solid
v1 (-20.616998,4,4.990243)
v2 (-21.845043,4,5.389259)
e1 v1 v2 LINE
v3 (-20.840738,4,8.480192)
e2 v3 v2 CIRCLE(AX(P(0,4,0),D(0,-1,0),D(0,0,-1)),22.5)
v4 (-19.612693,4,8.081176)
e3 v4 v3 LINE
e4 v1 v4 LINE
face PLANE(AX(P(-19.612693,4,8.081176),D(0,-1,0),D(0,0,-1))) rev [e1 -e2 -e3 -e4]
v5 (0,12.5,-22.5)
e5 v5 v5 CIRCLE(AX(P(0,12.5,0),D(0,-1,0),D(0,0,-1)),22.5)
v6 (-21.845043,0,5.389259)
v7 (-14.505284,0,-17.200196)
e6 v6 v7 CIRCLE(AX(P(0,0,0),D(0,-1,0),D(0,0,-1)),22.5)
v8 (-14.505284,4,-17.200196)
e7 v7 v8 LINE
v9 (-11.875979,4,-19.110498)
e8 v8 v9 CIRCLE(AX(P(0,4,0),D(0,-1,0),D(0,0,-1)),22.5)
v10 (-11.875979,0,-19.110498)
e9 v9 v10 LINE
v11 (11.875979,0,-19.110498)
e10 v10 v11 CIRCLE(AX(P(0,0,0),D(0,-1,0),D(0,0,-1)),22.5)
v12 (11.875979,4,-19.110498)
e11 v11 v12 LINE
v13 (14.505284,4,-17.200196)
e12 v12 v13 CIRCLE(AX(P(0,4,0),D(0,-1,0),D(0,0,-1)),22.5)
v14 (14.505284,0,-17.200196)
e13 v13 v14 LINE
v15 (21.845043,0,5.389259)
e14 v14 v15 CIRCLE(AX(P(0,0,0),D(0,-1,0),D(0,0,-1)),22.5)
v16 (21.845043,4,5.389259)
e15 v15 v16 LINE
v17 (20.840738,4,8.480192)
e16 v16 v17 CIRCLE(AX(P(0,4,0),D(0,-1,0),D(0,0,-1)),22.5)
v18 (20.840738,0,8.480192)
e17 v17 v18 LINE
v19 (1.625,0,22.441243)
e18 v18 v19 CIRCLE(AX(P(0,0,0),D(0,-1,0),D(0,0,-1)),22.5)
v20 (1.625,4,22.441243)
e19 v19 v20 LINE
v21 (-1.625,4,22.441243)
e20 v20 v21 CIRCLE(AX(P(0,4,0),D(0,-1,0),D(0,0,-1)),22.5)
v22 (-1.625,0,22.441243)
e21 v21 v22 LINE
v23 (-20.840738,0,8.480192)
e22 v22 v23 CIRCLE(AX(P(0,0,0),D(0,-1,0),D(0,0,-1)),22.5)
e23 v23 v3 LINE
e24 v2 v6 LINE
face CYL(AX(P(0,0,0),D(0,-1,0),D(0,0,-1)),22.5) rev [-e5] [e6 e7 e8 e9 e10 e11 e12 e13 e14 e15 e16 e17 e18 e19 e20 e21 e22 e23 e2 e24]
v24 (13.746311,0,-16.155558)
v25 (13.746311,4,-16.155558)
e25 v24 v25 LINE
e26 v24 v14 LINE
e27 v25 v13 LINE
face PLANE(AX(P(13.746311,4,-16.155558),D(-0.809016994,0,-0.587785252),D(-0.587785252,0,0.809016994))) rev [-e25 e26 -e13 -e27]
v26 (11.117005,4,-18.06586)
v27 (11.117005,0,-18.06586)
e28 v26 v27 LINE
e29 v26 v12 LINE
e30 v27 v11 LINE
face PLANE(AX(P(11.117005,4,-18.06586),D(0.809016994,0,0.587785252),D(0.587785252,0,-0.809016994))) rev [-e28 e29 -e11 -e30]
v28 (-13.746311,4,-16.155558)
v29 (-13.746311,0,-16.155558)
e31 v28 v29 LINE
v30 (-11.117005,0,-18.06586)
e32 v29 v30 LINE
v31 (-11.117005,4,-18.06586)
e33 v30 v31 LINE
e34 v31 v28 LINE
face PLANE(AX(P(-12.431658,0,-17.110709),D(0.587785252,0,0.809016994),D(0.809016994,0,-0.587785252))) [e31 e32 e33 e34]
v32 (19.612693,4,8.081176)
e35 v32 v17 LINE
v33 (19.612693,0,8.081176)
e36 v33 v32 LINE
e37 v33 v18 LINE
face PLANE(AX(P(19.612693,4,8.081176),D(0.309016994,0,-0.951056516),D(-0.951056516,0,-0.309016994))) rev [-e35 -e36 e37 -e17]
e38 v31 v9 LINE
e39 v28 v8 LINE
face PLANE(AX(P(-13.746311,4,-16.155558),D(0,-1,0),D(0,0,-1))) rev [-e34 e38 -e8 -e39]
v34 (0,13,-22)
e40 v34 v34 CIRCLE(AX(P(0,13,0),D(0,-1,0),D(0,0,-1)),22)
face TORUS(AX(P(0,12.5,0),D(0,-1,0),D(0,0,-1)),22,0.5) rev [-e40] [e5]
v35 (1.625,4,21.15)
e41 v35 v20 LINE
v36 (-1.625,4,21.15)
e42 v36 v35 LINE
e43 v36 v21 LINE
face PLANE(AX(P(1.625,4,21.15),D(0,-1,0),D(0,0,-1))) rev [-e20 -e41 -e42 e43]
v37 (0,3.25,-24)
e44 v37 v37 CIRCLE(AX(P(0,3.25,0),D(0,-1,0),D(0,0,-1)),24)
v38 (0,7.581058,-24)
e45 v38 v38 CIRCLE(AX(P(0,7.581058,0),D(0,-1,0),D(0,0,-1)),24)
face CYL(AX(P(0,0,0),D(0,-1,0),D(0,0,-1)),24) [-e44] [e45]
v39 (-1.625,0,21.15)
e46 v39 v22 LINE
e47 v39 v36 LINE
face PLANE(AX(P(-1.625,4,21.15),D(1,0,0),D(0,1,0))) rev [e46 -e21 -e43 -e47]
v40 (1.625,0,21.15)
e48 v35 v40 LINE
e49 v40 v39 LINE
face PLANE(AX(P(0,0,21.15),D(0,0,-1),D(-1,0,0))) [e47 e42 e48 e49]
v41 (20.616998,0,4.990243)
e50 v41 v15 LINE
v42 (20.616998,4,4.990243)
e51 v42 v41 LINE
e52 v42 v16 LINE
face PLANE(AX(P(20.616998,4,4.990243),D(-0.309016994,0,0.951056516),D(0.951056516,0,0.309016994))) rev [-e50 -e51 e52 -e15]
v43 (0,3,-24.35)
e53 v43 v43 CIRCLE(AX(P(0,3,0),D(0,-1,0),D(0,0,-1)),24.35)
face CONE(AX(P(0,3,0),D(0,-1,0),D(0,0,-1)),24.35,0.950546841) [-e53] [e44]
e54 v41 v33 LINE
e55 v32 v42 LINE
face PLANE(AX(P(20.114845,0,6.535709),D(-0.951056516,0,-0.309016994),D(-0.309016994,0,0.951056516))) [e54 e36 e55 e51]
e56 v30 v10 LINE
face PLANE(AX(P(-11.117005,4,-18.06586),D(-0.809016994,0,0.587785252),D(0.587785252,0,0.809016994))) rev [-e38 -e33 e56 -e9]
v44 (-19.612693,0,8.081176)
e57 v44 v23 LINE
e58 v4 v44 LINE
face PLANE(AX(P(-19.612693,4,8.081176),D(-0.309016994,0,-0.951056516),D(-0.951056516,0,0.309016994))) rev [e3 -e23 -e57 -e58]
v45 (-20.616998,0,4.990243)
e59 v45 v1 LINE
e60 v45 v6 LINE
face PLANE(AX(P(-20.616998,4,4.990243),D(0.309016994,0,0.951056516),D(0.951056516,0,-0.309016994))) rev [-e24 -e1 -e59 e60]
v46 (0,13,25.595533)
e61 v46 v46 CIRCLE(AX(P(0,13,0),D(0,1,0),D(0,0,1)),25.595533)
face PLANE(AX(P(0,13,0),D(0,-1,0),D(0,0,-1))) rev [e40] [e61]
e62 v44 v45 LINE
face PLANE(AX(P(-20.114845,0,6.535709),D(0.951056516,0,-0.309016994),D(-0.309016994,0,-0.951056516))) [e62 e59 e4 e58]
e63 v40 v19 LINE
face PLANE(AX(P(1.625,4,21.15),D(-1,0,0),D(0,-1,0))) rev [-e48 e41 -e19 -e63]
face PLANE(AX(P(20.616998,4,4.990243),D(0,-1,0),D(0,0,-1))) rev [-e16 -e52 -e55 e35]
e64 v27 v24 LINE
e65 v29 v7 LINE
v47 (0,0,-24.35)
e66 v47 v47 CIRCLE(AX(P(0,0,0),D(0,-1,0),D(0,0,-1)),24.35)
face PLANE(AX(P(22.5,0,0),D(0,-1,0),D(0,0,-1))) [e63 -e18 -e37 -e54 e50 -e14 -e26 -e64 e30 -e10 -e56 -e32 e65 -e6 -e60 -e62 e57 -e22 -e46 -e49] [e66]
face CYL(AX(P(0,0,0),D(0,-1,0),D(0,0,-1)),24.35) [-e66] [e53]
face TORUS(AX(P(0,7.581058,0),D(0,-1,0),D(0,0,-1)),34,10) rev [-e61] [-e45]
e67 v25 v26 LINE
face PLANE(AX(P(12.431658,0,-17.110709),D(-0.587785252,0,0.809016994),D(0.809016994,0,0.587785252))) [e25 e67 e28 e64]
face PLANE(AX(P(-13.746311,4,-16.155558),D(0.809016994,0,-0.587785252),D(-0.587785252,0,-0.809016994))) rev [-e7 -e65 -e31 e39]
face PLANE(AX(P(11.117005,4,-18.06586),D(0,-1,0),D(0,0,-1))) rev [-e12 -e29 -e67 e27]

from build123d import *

# Parameters (mm, degrees)
CUT_EXTRUDE3_DEPTH           = 60
CUT_EXTRUDE5_DEPTH           = 2
CUT_EXTRUDE5_DEPTH_BACK      = 30
SKETCH9_R                    = 38
SKETCH9_R_2                  = 23
SKETCH19_W                   = 12
SKETCH19_H                   = 36.5
CUT_REVOLVE2_ANGLE           = 65
CUT_REVOLVE2_OTHER_WAY_ANGLE = 65
SKETCH21_W                   = 3.25
SKETCH21_H                   = 4
BOSS_EXTRUDE3_DEPTH          = 1.35
CIRPATTERN1_COUNT            = 5
CUT_EXTRUDE9_START           = -5
CUT_EXTRUDE9_DEPTH           = 5
SKETCH23_R                   = 10.5
CUT_EXTRUDE10_DEPTH          = 10
SKETCH24_W                   = 15
SKETCH24_H                   = 8
BOSS_EXTRUDE4_DEPTH          = 8
SKETCH26_W                   = 10
SKETCH26_H                   = 6
CUT_EXTRUDE11_DEPTH          = 10
SKETCH27_W                   = 4
SKETCH27_H                   = 5
CUT_EXTRUDE12_DEPTH          = 5
CUT_EXTRUDE14_DEPTH          = 2
CUT_EXTRUDE14_DEPTH_BACK     = 30
SKETCH29_R                   = 1
CUT_EXTRUDE15_DEPTH          = 15
FILLET1_R                    = 6
FILLET2_R                    = 8
INTERSECT2_START             = 13
INTERSECT2_DEPTH             = 50.427876097


# Read off the part's stored shape, not the designer's step: Cut-Extrude9, Intersect2
with BuildPart() as part:
    # Sketch1 → Revolve1 (revolve)
    with BuildSketch(Plane.XY, mode=Mode.PRIVATE) as revolve1_sk:
        with BuildLine():
            Line((0, 63.427876097), (32, 63.427876097))
            ThreePointArc((32, 63.427876097), (37.656854249, 61.084730346), (40, 55.427876097))
            Line((40, 55.427876097), (40, 28.846818009))
            ThreePointArc((40, 28.846818009), (38.792081772, 24.082439968), (35.460140376, 20.469057744))
            Line((35.460140376, 20.469057744), (28.539859624, 15.958818353))
            ThreePointArc((28.539859624, 15.958818353), (25.207918228, 12.345436129), (24, 7.581058088))
            Line((24, 7.581058088), (24, 3.25))
            Line((24, 3.25), (24.35, 3))
            Line((24.35, 3), (24.35, 0))
            Line((24.35, 0), (22.5, 0))
            Line((22.5, 0), (22.5, 12.5))
            ThreePointArc((22.5, 12.5), (22.353553391, 12.853553391), (22, 13))
            Line((22, 13), (0, 13))
            Line((0, 13), (0, 63.427876097))
        make_face()
    revolve(revolve1_sk.sketch.rotate(Axis((0, 0, 0), (0, 1, 0)), 90), axis=Axis((0, 0, 0), (0, 1, 0)))

    # Sketch11 → Cut-Extrude3 (cut)
    with BuildSketch(Plane(origin=(0, 13, 0), x_dir=(-1, 0, 0), z_dir=(0, -1, 0))):
        with BuildLine():
            Line((-21, 0), (21, 0))
            ThreePointArc((21, 0), (0, 21), (-21, 0))
        make_face()
    extrude(amount=-CUT_EXTRUDE3_DEPTH, mode=Mode.SUBTRACT)

    # Sketch9 → Cut-Extrude5 (cut, two sides: drawn at the far end of the back side and taken through both)
    with BuildSketch(Plane(origin=(0, 55.427876097, 0), x_dir=(1, 0, 0), z_dir=(0, 1, 0)).offset(-CUT_EXTRUDE5_DEPTH_BACK)):
        with Locations(Location((0, 0, 0), (0, 0, 270))):
            Circle(SKETCH9_R)
        with Locations(Location((0, 0, 0), (0, 0, 270))):
            Circle(SKETCH9_R_2, mode=Mode.SUBTRACT)
    extrude(amount=CUT_EXTRUDE5_DEPTH + CUT_EXTRUDE5_DEPTH_BACK, mode=Mode.SUBTRACT)

    # Sketch19 → Cut-Revolve2 (revolve, cut)
    with BuildSketch(Plane(origin=(0, 0, 0), x_dir=(0, 0, -1), z_dir=(1, 0, 0))):
        with Locations((-41.064715832, 37.177876097)):
            Rectangle(SKETCH19_W, SKETCH19_H)
    revolve(axis=Axis((0, 0, 0), (0, 1, 0)), revolution_arc=CUT_REVOLVE2_ANGLE, mode=Mode.SUBTRACT)

    # Sketch19 → Cut-Revolve2 other way (revolve, cut)
    with BuildSketch(Plane(origin=(0, 0, 0), x_dir=(0, 0, -1), z_dir=(1, 0, 0))):
        with Locations((-41.064715832, 37.177876097)):
            Rectangle(SKETCH19_W, SKETCH19_H)
    revolve(axis=Axis((0, 0, 0), (0, -1, 0)), revolution_arc=CUT_REVOLVE2_OTHER_WAY_ANGLE, mode=Mode.SUBTRACT)

    # Sketch21 → Boss-Extrude3 (add)
    with BuildSketch(Plane(origin=(0, 0, 22.5), x_dir=(-1, 0, 0), z_dir=(0, 0, -1))):
        with Locations((0, 2)):
            Rectangle(SKETCH21_W, SKETCH21_H)
    boss_extrude3 = extrude(amount=BOSS_EXTRUDE3_DEPTH)

    # CirPattern1: Boss-Extrude3 ×5 about axis
    cirpattern1_axis = Axis((0, 0, 0), (0, 1, 0))
    for i in range(1, CIRPATTERN1_COUNT):
        add(boss_extrude3.rotate(cirpattern1_axis, i * 360 / CIRPATTERN1_COUNT))

    # Cut-Extrude9 outline → Cut-Extrude9 (cut)
    with BuildSketch(Plane(origin=(0, 63.427876097, 0), x_dir=(1, 0, 0), z_dir=(0, 1, 0)).offset(CUT_EXTRUDE9_START)):
        with BuildLine():
            ThreePointArc((40, 0), (0, 40), (-40, 0))
            Line((-40, 0), (-21, 0))
            ThreePointArc((-21, 0), (0, 21), (21, 0))
            Line((21, 0), (40, 0))
        make_face()
    extrude(amount=CUT_EXTRUDE9_DEPTH, mode=Mode.SUBTRACT)

    # Sketch23 → Cut-Extrude10 (cut)
    with BuildSketch(Plane(origin=(0, 0, -40), x_dir=(-1, 0, 0), z_dir=(0, 0, -1))):
        with Locations((0, 42.137876097)):
            Circle(SKETCH23_R)
    extrude(amount=-CUT_EXTRUDE10_DEPTH, mode=Mode.SUBTRACT)

    # Sketch24 → Boss-Extrude4 (add)
    with BuildSketch(Plane(origin=(0, 58.427876097, 0), x_dir=(1, 0, 0), z_dir=(0, 1, 0))):
        with Locations((0, 30)):
            Rectangle(SKETCH24_W, SKETCH24_H)
    extrude(amount=-BOSS_EXTRUDE4_DEPTH)

    # Sketch26 → Cut-Extrude11 (cut)
    with BuildSketch(Plane(origin=(0, 58.427876097, 0), x_dir=(1, 0, 0), z_dir=(0, 1, 0))):
        with Locations((0, 30)):
            Rectangle(SKETCH26_W, SKETCH26_H)
    extrude(amount=-CUT_EXTRUDE11_DEPTH, mode=Mode.SUBTRACT)

    # Sketch27 → Cut-Extrude12 (cut)
    with BuildSketch(Plane(origin=(7.5, 0, 0), x_dir=(0, 0, -1), z_dir=(1, 0, 0))):
        with Locations((30, 53.927876097)):
            Rectangle(SKETCH27_W, SKETCH27_H)
    extrude(amount=-CUT_EXTRUDE12_DEPTH, mode=Mode.SUBTRACT)

    # Sketch28 → Cut-Extrude14 (cut, two sides: drawn at the far end of the back side and taken through both)
    with BuildSketch(Plane(origin=(0, 55.427876097, 0), x_dir=(1, 0, 0), z_dir=(0, 1, 0)).offset(-CUT_EXTRUDE14_DEPTH_BACK)):
        with BuildLine():
            Line((-22.912878475, -2), (22.912878475, -2))
            ThreePointArc((22.912878475, -2), (0, -23), (-22.912878475, -2))
        make_face()
    extrude(amount=CUT_EXTRUDE14_DEPTH + CUT_EXTRUDE14_DEPTH_BACK, mode=Mode.SUBTRACT)

    # Sketch29 → Cut-Extrude15 (cut)
    with BuildSketch(Plane(origin=(0, 0, 0), x_dir=(-1, 0, 0), z_dir=(0, 0, -1))):
        with Locations((-30.416198487, 60.927876097)):
            Circle(SKETCH29_R)
        with Locations((30.416198487, 60.927876097)):
            Circle(SKETCH29_R)
        with Locations((0, 60.927876097)):
            Circle(SKETCH29_R)
    extrude(amount=-CUT_EXTRUDE15_DEPTH, mode=Mode.SUBTRACT)

    # Fillet1
    fillet1_edges = [part.edges().sort_by_distance(p)[0] for p in [
        (21, 35.713938048, 0),
        (-21, 35.713938048, 0),
    ]]
    fillet(fillet1_edges, radius=FILLET1_R)

    # Fillet2
    fillet2_edges = [part.edges().sort_by_distance(p)[0] for p in [
        (-22.912878475, 41.427876097, 2),
        (22.912878475, 41.427876097, 2),
    ]]
    fillet(fillet2_edges, radius=FILLET2_R)

    # Intersect2 outline → Intersect2 (cut)
    with BuildSketch(Plane(origin=(0, 0, 0), x_dir=(1, 0, 0), z_dir=(0, 1, 0)).offset(INTERSECT2_START)):
        with BuildLine():
            Line((-37.080992435, -15), (-42, -15))
            Line((-42, -15), (-42, -42))
            Line((-42, -42), (42, -42))
            Line((42, -42), (42, -15))
            Line((42, -15), (37.080992435, -15))
            ThreePointArc((37.080992435, -15), (0, 40), (-37.080992435, -15))
        make_face()
        with BuildLine():
            ThreePointArc((-13.747727085, 0), (-18.767687244, 2.713664655), (-19.246817919, 8.4))
            ThreePointArc((-19.246817919, 8.4), (0, 21), (19.246817919, 8.4))
            ThreePointArc((19.246817919, 8.4), (18.767687244, 2.713664655), (13.747727085, 0))
            Line((13.747727085, 0), (-13.747727085, 0))
        make_face(mode=Mode.SUBTRACT)
    extrude(amount=INTERSECT2_DEPTH, mode=Mode.SUBTRACT)


solid = part.part
